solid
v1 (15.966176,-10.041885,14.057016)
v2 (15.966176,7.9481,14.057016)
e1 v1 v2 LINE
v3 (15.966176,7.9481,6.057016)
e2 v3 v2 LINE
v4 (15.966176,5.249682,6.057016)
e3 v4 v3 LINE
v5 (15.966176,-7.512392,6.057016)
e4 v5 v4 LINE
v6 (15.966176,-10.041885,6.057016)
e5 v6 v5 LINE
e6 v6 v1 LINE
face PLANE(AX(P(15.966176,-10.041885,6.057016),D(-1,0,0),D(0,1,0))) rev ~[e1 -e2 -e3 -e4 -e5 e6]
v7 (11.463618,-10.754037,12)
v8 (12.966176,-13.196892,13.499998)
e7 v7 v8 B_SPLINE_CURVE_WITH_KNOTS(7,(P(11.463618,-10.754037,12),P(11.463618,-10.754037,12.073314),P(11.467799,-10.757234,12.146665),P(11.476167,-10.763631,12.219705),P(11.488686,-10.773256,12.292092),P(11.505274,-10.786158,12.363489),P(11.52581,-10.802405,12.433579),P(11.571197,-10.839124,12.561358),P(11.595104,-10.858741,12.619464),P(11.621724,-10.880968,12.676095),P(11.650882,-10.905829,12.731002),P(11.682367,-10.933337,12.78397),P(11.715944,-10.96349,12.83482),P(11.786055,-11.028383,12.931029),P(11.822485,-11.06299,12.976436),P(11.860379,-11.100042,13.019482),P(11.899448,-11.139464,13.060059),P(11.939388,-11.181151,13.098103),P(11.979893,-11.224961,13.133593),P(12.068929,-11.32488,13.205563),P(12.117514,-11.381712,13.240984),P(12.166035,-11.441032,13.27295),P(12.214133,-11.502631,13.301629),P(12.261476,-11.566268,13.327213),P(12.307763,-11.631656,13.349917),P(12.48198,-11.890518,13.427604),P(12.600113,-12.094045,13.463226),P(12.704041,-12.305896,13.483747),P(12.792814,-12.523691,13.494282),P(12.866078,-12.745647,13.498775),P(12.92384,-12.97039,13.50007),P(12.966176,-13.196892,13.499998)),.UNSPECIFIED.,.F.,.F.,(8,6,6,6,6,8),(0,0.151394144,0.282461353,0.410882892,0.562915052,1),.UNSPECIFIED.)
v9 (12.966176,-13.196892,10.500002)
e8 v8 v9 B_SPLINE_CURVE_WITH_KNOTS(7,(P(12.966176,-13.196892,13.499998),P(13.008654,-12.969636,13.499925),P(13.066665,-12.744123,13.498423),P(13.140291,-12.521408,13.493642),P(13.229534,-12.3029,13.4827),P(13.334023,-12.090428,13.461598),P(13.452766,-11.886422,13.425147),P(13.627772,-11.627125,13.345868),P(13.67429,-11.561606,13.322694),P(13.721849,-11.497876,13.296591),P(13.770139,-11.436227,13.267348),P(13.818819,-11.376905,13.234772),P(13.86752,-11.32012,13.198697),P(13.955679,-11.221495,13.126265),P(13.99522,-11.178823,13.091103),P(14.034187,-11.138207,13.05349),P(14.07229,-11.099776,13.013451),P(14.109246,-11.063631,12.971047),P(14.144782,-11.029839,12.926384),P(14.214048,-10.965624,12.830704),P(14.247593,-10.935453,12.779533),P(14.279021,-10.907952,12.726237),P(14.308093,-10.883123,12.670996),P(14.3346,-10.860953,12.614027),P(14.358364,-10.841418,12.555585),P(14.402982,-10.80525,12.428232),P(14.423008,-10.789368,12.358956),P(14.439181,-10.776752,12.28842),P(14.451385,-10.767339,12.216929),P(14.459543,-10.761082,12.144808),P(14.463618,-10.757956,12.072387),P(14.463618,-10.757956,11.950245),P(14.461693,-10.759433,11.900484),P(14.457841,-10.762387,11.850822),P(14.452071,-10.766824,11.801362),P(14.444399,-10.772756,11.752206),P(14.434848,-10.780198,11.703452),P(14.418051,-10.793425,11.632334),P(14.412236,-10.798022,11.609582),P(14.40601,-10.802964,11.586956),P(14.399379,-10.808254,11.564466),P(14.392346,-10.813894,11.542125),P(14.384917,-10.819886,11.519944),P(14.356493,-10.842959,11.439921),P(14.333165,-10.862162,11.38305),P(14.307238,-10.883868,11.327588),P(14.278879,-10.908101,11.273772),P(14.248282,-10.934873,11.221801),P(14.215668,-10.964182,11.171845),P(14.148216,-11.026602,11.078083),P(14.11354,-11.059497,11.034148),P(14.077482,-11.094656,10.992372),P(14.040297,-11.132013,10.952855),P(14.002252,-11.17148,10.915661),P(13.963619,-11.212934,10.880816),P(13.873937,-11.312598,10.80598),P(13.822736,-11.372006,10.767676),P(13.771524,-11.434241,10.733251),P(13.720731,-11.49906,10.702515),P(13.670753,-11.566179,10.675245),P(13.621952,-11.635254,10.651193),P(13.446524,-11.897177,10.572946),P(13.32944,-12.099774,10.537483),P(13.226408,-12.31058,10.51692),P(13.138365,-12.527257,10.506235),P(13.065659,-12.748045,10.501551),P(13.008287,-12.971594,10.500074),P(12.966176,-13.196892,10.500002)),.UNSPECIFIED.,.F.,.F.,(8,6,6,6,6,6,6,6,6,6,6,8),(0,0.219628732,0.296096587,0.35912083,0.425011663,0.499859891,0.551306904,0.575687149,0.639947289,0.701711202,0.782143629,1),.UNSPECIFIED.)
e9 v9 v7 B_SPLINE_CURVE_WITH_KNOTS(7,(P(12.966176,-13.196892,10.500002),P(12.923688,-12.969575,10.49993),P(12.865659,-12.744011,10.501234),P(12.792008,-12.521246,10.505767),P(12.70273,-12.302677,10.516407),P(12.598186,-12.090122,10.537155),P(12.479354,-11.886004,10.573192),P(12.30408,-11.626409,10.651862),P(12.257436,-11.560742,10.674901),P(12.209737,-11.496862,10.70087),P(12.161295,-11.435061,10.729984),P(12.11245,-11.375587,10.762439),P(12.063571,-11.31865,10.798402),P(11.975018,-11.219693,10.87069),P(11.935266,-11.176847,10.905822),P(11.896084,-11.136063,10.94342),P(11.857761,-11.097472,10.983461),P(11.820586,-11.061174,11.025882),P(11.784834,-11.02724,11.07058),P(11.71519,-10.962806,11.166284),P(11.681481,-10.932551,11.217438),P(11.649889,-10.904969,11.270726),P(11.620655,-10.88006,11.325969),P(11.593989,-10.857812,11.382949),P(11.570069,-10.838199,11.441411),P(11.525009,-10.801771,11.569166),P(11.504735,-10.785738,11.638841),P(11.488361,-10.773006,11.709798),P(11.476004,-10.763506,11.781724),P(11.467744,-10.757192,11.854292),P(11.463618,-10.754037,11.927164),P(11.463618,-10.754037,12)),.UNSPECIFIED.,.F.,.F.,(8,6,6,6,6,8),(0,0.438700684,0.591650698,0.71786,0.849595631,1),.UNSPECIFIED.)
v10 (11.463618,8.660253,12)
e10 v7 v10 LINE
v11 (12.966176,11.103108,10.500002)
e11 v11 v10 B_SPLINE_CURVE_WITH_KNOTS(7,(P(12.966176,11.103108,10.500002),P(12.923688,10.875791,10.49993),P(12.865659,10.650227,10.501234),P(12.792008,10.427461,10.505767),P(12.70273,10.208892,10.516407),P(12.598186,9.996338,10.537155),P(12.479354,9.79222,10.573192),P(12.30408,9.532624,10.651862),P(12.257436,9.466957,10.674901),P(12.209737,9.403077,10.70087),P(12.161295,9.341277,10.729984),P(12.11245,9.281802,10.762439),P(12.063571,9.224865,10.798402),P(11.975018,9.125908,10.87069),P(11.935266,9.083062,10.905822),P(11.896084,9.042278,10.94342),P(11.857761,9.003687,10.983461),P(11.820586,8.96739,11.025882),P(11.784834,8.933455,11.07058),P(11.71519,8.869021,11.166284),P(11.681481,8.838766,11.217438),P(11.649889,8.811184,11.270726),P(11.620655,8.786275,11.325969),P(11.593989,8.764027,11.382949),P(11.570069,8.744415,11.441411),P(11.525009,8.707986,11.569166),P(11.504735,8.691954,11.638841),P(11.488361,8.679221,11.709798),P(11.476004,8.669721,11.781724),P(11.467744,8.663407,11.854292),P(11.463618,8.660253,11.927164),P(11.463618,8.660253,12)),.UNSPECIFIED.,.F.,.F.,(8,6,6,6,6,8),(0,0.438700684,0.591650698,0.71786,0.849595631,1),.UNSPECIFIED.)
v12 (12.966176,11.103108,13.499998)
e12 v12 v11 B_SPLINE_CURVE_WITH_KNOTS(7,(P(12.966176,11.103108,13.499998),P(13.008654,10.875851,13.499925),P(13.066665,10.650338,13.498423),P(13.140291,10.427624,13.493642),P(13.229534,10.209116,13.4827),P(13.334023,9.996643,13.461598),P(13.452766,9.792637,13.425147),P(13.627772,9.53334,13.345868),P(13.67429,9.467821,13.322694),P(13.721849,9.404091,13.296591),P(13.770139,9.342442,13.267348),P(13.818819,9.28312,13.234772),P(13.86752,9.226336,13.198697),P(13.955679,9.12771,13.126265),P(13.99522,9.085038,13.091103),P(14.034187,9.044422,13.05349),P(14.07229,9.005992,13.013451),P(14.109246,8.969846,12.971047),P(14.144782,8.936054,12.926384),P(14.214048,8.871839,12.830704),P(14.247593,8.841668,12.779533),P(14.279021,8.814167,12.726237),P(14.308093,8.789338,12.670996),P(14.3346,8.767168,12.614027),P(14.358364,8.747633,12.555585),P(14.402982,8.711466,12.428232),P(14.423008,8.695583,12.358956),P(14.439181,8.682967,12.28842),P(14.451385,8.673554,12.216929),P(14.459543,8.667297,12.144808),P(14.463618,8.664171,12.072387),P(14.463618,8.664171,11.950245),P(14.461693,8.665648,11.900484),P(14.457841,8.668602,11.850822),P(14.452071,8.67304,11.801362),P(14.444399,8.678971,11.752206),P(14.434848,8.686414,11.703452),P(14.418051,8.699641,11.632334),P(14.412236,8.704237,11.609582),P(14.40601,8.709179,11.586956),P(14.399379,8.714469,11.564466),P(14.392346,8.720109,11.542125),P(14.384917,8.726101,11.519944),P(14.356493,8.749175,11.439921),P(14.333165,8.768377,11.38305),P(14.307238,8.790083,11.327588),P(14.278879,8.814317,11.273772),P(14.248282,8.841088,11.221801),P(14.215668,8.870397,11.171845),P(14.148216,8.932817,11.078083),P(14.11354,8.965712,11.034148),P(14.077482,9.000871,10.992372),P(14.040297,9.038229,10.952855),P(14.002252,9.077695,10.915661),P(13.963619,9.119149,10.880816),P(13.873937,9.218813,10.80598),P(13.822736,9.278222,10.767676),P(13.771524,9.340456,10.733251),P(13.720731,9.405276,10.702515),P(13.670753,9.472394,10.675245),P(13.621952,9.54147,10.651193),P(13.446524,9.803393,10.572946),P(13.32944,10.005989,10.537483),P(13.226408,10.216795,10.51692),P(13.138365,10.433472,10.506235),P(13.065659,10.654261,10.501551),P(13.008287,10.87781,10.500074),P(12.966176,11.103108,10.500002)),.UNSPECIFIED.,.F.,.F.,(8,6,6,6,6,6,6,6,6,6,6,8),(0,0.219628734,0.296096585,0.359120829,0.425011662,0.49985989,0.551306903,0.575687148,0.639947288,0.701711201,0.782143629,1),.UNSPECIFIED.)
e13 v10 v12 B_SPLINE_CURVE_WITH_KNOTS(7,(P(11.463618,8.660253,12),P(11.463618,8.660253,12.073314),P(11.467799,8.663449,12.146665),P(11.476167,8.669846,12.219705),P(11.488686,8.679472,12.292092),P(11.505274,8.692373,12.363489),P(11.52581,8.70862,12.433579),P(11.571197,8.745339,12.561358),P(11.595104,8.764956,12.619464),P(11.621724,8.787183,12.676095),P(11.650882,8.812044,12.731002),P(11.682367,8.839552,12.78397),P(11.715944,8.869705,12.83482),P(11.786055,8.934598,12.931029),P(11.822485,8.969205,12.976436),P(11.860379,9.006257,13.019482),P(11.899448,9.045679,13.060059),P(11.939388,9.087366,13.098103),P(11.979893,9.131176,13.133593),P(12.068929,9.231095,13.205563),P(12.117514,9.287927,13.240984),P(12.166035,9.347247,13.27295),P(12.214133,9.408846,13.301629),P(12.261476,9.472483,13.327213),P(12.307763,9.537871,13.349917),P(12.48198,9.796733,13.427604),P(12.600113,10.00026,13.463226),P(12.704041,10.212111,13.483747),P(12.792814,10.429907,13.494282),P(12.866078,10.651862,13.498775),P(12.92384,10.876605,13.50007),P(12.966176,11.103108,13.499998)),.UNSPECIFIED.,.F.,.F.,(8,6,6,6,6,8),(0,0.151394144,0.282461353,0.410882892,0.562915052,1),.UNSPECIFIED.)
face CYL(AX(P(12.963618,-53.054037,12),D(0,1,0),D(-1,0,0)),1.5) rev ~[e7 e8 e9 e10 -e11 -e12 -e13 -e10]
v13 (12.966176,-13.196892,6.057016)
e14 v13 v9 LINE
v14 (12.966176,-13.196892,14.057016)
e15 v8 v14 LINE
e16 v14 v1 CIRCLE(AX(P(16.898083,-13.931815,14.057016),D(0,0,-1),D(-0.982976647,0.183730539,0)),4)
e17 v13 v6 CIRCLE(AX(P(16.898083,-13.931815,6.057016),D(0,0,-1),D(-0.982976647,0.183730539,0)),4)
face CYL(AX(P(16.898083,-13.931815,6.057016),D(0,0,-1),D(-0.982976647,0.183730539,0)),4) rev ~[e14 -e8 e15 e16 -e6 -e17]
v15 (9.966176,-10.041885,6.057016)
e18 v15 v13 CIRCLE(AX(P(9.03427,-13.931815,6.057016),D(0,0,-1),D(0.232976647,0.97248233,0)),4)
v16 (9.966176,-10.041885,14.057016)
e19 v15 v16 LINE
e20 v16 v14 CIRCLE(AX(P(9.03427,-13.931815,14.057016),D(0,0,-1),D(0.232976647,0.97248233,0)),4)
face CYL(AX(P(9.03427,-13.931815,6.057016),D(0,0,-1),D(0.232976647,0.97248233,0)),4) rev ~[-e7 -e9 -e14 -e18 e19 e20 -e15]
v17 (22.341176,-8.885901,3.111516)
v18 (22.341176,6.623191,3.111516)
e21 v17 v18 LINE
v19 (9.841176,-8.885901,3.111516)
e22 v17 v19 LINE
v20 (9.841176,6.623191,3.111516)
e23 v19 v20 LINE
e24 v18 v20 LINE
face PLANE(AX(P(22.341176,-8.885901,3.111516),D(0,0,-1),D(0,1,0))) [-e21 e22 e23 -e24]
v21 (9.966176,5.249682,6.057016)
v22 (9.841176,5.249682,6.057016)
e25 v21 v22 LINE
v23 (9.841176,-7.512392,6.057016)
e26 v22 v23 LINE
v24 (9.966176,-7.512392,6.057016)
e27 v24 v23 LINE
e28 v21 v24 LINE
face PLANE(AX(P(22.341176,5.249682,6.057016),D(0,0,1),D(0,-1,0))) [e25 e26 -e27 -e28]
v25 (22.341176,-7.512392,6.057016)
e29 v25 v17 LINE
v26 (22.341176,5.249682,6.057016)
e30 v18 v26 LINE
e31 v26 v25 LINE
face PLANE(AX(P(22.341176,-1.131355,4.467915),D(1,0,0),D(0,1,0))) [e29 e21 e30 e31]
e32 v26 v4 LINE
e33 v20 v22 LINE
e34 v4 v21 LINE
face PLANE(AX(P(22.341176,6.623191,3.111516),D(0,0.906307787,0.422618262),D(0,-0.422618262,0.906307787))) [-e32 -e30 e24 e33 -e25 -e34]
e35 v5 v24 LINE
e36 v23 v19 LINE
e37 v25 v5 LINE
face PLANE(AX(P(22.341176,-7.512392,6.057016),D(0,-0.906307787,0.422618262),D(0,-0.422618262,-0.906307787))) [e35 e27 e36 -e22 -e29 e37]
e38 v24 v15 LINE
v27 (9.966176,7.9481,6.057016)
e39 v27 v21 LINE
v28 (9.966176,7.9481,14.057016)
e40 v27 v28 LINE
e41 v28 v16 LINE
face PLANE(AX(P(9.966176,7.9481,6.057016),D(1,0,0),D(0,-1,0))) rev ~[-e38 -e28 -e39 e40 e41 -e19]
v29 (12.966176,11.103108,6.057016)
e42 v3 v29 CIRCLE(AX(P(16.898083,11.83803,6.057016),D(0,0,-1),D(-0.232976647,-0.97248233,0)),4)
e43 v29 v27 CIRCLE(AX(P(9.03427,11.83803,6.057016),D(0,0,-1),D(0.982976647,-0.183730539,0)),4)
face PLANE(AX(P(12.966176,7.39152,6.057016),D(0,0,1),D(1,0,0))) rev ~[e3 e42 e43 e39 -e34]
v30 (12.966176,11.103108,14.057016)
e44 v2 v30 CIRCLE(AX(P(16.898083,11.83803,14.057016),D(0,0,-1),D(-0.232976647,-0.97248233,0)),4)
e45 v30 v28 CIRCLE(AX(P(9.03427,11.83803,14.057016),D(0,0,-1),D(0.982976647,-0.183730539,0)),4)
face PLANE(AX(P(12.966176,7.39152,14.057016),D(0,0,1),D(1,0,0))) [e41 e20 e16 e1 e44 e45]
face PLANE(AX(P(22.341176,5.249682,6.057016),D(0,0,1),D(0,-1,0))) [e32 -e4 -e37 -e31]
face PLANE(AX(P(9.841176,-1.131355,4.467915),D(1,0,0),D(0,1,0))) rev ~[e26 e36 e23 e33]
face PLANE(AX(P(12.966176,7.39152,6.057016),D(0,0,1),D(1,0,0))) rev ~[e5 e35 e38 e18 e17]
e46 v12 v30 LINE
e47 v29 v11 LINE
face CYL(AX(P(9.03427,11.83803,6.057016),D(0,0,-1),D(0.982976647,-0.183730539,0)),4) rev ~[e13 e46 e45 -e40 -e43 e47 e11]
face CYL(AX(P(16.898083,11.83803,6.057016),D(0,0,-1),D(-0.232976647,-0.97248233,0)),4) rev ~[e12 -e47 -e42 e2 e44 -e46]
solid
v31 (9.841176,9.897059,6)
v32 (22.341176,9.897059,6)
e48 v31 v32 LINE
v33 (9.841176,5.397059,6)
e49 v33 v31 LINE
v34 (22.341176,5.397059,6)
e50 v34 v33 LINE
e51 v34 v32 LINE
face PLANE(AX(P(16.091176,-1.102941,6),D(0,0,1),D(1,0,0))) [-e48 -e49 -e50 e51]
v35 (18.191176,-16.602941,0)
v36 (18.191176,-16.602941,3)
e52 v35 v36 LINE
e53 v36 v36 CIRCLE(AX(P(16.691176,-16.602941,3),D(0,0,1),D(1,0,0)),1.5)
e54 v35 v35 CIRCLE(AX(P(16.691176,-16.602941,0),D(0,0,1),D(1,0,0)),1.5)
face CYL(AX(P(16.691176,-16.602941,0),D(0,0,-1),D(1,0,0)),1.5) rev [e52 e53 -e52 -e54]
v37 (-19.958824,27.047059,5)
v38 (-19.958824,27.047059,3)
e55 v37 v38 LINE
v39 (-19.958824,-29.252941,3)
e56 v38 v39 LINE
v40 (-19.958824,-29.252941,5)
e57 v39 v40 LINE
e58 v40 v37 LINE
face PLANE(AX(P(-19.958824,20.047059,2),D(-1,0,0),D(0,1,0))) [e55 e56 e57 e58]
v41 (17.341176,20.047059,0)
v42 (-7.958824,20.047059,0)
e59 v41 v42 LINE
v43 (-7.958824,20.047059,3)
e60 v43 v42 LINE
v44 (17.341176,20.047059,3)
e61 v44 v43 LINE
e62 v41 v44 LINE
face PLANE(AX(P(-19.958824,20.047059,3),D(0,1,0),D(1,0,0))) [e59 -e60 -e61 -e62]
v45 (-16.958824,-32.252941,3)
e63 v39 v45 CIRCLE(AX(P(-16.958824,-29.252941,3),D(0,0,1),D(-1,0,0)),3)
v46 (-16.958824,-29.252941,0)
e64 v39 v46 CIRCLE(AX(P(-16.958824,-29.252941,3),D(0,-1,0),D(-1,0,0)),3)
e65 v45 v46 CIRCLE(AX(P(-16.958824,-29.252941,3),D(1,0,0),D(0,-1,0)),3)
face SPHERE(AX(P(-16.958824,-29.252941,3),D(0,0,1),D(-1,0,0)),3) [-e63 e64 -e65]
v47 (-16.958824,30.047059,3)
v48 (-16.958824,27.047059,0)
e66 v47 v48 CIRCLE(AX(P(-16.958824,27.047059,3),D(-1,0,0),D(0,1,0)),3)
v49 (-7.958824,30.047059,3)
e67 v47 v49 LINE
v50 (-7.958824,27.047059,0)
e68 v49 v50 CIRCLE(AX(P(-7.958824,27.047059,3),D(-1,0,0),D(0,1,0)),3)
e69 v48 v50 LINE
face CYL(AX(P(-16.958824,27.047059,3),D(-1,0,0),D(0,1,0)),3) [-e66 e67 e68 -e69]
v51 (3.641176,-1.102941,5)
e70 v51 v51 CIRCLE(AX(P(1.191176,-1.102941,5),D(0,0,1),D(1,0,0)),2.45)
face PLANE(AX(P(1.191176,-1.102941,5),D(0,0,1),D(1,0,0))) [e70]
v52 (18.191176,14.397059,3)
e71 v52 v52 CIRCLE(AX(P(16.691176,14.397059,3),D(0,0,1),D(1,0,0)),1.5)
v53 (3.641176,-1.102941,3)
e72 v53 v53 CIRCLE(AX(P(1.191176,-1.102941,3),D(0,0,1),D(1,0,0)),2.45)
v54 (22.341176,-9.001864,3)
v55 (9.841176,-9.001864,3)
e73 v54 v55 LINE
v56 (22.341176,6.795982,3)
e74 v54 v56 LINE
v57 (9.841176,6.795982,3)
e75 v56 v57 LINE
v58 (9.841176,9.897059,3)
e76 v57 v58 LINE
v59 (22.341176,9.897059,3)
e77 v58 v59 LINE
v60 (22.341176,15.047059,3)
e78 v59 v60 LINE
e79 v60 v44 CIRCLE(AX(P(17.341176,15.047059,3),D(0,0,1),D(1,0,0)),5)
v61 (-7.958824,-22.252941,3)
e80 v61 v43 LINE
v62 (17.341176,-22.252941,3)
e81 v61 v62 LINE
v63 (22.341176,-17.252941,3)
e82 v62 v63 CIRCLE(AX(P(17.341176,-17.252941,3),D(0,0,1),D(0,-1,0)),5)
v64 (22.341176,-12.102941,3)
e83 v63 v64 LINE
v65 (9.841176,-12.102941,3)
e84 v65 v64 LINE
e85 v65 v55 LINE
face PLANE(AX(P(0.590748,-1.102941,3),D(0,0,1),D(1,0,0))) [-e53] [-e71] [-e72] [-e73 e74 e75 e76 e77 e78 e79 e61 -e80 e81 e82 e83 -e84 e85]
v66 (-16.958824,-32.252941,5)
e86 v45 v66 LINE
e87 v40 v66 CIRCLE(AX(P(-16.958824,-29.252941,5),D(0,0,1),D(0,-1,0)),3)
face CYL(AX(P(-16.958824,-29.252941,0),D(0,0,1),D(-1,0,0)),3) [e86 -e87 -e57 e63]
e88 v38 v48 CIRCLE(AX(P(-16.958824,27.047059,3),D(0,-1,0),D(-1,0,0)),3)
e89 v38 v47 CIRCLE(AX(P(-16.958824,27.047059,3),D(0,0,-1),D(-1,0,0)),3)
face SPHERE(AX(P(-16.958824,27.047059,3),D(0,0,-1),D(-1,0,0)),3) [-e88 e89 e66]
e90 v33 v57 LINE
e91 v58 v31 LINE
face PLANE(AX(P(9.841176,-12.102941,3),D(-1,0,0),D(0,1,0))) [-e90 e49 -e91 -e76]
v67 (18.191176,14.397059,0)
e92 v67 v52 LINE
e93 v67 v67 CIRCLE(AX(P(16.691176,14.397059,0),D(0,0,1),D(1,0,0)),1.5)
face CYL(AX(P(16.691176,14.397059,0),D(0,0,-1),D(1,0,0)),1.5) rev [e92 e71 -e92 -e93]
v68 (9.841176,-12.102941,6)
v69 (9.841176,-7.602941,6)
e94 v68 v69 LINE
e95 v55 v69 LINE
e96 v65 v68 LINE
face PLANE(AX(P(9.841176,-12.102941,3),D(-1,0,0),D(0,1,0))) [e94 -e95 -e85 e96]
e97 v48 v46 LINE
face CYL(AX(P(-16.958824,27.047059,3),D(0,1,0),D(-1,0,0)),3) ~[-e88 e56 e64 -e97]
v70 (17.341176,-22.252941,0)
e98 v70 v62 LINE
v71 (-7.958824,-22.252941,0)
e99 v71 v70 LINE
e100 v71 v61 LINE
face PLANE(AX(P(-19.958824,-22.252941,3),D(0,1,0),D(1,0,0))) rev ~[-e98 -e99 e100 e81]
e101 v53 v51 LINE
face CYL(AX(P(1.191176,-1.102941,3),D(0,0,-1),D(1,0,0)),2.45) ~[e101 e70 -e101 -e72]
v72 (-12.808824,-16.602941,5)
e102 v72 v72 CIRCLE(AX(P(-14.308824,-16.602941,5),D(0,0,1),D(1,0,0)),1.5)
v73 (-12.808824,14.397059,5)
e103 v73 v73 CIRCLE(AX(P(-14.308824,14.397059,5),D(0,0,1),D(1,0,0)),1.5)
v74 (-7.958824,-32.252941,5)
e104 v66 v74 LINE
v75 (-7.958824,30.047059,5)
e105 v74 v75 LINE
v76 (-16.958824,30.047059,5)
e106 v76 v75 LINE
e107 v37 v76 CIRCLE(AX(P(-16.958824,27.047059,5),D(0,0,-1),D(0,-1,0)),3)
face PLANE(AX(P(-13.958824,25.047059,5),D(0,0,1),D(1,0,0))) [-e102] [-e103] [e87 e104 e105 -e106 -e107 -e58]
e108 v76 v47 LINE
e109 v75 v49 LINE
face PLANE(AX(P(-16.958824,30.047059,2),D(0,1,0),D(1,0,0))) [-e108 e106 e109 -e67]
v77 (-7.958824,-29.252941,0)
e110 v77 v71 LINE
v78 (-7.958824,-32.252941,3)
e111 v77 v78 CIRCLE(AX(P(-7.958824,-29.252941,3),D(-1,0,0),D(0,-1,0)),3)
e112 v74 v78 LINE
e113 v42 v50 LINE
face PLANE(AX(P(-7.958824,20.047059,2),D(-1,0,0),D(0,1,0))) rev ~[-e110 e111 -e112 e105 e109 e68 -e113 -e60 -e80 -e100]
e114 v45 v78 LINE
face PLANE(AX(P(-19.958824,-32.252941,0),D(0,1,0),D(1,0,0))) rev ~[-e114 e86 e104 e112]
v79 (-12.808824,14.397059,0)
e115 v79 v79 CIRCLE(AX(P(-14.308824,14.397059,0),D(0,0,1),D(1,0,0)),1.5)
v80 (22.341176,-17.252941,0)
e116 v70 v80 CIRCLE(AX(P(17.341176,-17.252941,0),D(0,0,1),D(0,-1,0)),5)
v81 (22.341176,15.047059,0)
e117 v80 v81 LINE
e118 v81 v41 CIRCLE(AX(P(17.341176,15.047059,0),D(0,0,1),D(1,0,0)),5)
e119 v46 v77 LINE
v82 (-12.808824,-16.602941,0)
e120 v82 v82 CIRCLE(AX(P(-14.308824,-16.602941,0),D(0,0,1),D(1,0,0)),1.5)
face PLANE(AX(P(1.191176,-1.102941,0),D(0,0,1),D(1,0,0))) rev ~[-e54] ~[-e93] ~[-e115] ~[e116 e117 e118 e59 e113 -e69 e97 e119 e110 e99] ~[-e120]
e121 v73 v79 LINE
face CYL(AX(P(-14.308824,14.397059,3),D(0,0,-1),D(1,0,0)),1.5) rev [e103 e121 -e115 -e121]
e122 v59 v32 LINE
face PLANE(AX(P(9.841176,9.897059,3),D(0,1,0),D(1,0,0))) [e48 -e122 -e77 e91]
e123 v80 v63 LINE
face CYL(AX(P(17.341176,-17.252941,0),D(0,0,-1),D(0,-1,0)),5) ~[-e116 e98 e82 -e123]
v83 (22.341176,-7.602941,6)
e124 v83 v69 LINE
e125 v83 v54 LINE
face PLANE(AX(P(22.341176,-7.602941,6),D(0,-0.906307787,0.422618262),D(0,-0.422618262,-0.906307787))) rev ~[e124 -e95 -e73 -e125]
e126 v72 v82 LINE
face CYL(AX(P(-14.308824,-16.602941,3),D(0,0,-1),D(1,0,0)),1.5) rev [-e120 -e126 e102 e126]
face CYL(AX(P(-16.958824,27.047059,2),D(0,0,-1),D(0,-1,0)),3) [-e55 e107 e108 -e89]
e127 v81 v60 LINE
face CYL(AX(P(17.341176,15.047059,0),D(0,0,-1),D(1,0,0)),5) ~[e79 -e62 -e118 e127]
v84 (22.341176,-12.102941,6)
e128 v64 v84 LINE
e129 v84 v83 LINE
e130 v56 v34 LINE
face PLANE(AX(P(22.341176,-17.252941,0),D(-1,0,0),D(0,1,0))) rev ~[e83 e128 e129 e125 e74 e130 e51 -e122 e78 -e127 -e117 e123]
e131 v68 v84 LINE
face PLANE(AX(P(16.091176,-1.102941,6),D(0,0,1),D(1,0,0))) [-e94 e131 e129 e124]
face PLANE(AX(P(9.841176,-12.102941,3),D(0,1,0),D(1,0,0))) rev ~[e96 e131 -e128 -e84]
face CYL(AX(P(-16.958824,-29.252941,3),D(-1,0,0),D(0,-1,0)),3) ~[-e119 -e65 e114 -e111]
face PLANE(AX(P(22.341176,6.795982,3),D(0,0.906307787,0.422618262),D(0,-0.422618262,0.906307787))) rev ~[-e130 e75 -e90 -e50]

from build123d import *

# Parameters (mm, degrees)
F1_R          = 1.5
F1_R_2        = 2.45
F2_DEPTH      = 3
F3_W          = 12
F3_H          = 42.3
F3_R          = 3.3
F3_R_2        = 1.5
F4_DEPTH      = 2
F1_W          = 12
F1_H          = 10
F5_DEPTH      = 2
F6_R          = 3
F3_R_3        = 2.45
F7_DEPTH      = 2
F7_DEPTH_BACK = 3
F8_DEPTH      = 3
F9_T1_DEPTH   = 56.3
F9_T3_DEPTH   = 16.5
F9_T6_ANGLE   = 90
F9_T8_ANGLE   = 90
F10_W         = 12.5
F10_H         = 22
F11_DEPTH     = 3
F13_DEPTH     = 13
F15_DEPTH     = 12.5
F16_W         = 6
F16_H         = 12.7620736001
F17_DEPTH     = 8
F19_D         = 3
F19_DEPTH     = 42.3
F19_START     = 11.4989038
F19_TIP       = 0.9012909285


# Not quite as in the source:
# - a fillet or chamfer that OpenCascade refuses, or shapes differently, is made with other operations: its cross-section is extruded or revolved along the edge and cut away or added
# - a feature names something its author has since deleted; it is built from what else it names


with BuildPart() as f2:
    # F1 (on Top) → F2 (new body)
    with BuildSketch(Plane.XY):
        with BuildLine():
            Line((-7.9588235294, 20.0470588235), (-19.9588235294, 20.0470588235))
            Line((-19.9588235294, 20.0470588235), (-19.9588235294, -22.2529411765))
            Line((-19.9588235294, -22.2529411765), (-7.9588235294, -22.2529411765))
            Line((-7.9588235294, -22.2529411765), (17.3411764706, -22.2529411765))
            ThreePointArc((17.3411764706, -22.2529411765), (20.8767103765, -20.7884750824), (22.3411764706, -17.2529411765))
            Line((22.3411764706, -17.2529411765), (22.3411764706, 15.0470588235))
            ThreePointArc((22.3411764706, 15.0470588235), (20.8767103765, 18.5825927295), (17.3411764706, 20.0470588235))
            Line((17.3411764706, 20.0470588235), (-7.9588235294, 20.0470588235))
        make_face()
        with Locations((-14.3088235294, -16.6029411765)):
            Circle(F1_R, mode=Mode.SUBTRACT)
        with Locations((1.1911764706, -1.1029411765)):
            Circle(F1_R_2, mode=Mode.SUBTRACT)
        with Locations((16.6911764706, -16.6029411765)):
            Circle(F1_R, mode=Mode.SUBTRACT)
        with Locations((-14.3088235294, 14.3970588235)):
            Circle(F1_R, mode=Mode.SUBTRACT)
        with Locations((16.6911764706, 14.3970588235)):
            Circle(F1_R, mode=Mode.SUBTRACT)
    extrude(amount=F2_DEPTH)

    # F3 (on face) → F4 (join)
    with BuildSketch(Plane.XY.offset(3)):
        with Locations((-13.9588235294, -1.1029411765)):
            Rectangle(F3_W, F3_H)
        with Locations((-14.3088235294, -16.6029411765)):
            Circle(F3_R, mode=Mode.SUBTRACT)
        with Locations((-14.3088235294, 14.3970588235)):
            Circle(F3_R, mode=Mode.SUBTRACT)
        with Locations((-14.3088235294, 14.3970588235)):
            Circle(F3_R)
        with Locations((-14.3088235294, 14.3970588235)):
            Circle(F3_R_2, mode=Mode.SUBTRACT)
        with Locations((-14.3088235294, -16.6029411765)):
            Circle(F3_R)
        with Locations((-14.3088235294, -16.6029411765)):
            Circle(F3_R_2, mode=Mode.SUBTRACT)
    extrude(amount=F4_DEPTH)

    # F1 (on Top) → F5 (join)
    with BuildSketch(Plane.XY):
        with Locations((-13.9588235294, 25.0470588235)):
            Rectangle(F1_W, F1_H)
        with Locations((-13.9588235294, -27.2529411765)):
            Rectangle(F1_W, F1_H)
    extrude(amount=F5_DEPTH)

    # F6
    f6_edges = [f2.edges().sort_by_distance(p)[0] for p in [
        (-19.958824, -32.252941, 1),
        (-19.958824, 30.047059, 1),
    ]]
    fillet(f6_edges, radius=F6_R)

    # F3 (on face) → F7 (join, two sides)
    with BuildSketch(Plane.XY.offset(3)) as f7_sk:
        with Locations((1.1911764706, -1.1029411765)):
            Circle(F3_R_3)
    extrude(amount=F7_DEPTH)
    extrude(f7_sk.sketch, amount=-F7_DEPTH_BACK)

    # F8 (add): faces of the model
    f8_faces = [f2.faces().sort_by_distance(p)[0] for p in [
        (-13.8716348016, 24.9762285246, 2),
        (-13.8716348016, -27.1821108776, 2),
    ]]
    extrude(f8_faces, amount=F8_DEPTH)

    # F9: fillet of radius 3 on 5 edges, made by hand

    # F9_s2 → F9_t1 (cut)
    with BuildSketch(Plane.XZ.offset(-27.0470588235)):
        with BuildLine():
            ThreePointArc((-19.9588235294, 3), (-19.080143873, 0.8786796564), (-16.9588235294, 0))
            Line((-16.9588235294, 0), (-19.9588235294, 0))
            Line((-19.9588235294, 0), (-19.9588235294, 3))
        make_face()
    extrude(amount=F9_T1_DEPTH, mode=Mode.SUBTRACT)

    # F9_s4 → F9_t3 (cut)
    with BuildSketch(Plane.YZ.offset(-16.9588235294)):
        with BuildLine():
            ThreePointArc((30.0470588235, 3), (29.1683791671, 0.8786796564), (27.0470588235, 0))
            Line((27.0470588235, 0), (30.0470588235, 0))
            Line((30.0470588235, 0), (30.0470588235, 3))
        make_face()
        with BuildLine():
            ThreePointArc((-32.2529411765, 3), (-31.37426152, 0.8786796564), (-29.2529411765, 0))
            Line((-29.2529411765, 0), (-32.2529411765, 0))
            Line((-32.2529411765, 0), (-32.2529411765, 3))
        make_face()
    extrude(amount=F9_T3_DEPTH, mode=Mode.SUBTRACT)

    # F9_s5 → F9_t6 (revolve, cut)
    with BuildSketch(Plane.XZ.offset(-27.0470588235)):
        with BuildLine():
            ThreePointArc((-19.9588235294, 3), (-19.080143873, 0.8786796564), (-16.9588235294, 0))
            Line((-16.9588235294, 0), (-19.9588235294, 0))
            Line((-19.9588235294, 0), (-19.9588235294, 3))
        make_face()
    revolve(axis=Axis((-16.9588235294, 27.0470588235, 0), (0, 0, -1)), revolution_arc=F9_T6_ANGLE, mode=Mode.SUBTRACT)

    # F9_s7 → F9_t8 (revolve, cut)
    with BuildSketch(Plane.XZ.offset(29.2529411765)):
        with BuildLine():
            ThreePointArc((-16.9588235294, 0), (-19.080143873, 0.8786796564), (-19.9588235294, 3))
            Line((-19.9588235294, 3), (-19.9588235294, 0))
            Line((-19.9588235294, 0), (-16.9588235294, 0))
        make_face()
    revolve(axis=Axis((-16.9588235294, -29.2529411765, 0), (0, 0, 1)), revolution_arc=F9_T8_ANGLE, mode=Mode.SUBTRACT)

    # F10 (on face) → F11 (join)
    with BuildSketch(Plane.XY.offset(3)):
        with Locations((16.0911764706, -1.1029411765)):
            Rectangle(F10_W, F10_H)
    extrude(amount=F11_DEPTH)

    # F12 (on face) → F13 (cut)
    with BuildSketch(Plane.YZ.offset(22.3411764706)):
        Polygon((5.3970588235, 6), (-7.6029411765, 6), (-9.0018641509, 3), (6.795981798, 3), align=None)
    extrude(amount=-F13_DEPTH, mode=Mode.SUBTRACT)


with BuildPart() as f15:
    # F14 (on face) → F15 (new body)
    with BuildSketch(Plane.YZ.offset(22.3411764706)):
        Polygon((6.6231914472, 3.1115159904), (5.2496820965, 6.0570162982), (-7.5123915035, 6.0570162982), (-8.8859008542, 3.1115159904), align=None)
    extrude(amount=-F15_DEPTH)

    # F16 (on face) → F17 (join)
    with BuildSketch(Plane.XY.offset(6.0570162982)):
        with BuildLine():
            ThreePointArc((12.9661764706, 11.1031076104), (11.9330087808, 9.0817074362), (9.9661764706, 7.9481004483))
            Line((9.9661764706, 7.9481004483), (9.9661764706, 5.2496820965))
            Line((9.9661764706, 5.2496820965), (15.9661764706, 5.2496820965))
            Line((15.9661764706, 5.2496820965), (15.9661764706, 7.9481004483))
            ThreePointArc((15.9661764706, 7.9481004483), (13.9993441603, 9.0817074362), (12.9661764706, 11.1031076104))
        make_face()
        with Locations((12.9661764706, -1.1313547035)):
            Rectangle(F16_W, F16_H)
        with BuildLine():
            Line((15.9661764706, -7.5123915035), (9.9661764706, -7.5123915035))
            Line((9.9661764706, -7.5123915035), (9.9661764706, -10.0418852275))
            ThreePointArc((9.9661764706, -10.0418852275), (11.9330087808, -11.1754922153), (12.9661764706, -13.1968923896))
            ThreePointArc((12.9661764706, -13.1968923896), (13.9993441603, -11.1754922153), (15.9661764706, -10.0418852275))
            Line((15.9661764706, -10.0418852275), (15.9661764706, -7.5123915035))
        make_face()
    extrude(amount=F17_DEPTH)

    # F19
    # its depths count from where the whole tool has entered the part; down to there all is cleared
    with Locations(Plane.XZ.offset(22.2529411765).offset(-F19_START)):
        with Locations((12.9636181518, 12)):
            Hole(F19_D / 2, depth=F19_DEPTH)
            with Locations((0, 0, -(F19_DEPTH + F19_TIP / 2))):  # 118° drill point
                Cone(0, F19_D / 2, F19_TIP, mode=Mode.SUBTRACT)


solid = Compound([f2.part, f15.part])
